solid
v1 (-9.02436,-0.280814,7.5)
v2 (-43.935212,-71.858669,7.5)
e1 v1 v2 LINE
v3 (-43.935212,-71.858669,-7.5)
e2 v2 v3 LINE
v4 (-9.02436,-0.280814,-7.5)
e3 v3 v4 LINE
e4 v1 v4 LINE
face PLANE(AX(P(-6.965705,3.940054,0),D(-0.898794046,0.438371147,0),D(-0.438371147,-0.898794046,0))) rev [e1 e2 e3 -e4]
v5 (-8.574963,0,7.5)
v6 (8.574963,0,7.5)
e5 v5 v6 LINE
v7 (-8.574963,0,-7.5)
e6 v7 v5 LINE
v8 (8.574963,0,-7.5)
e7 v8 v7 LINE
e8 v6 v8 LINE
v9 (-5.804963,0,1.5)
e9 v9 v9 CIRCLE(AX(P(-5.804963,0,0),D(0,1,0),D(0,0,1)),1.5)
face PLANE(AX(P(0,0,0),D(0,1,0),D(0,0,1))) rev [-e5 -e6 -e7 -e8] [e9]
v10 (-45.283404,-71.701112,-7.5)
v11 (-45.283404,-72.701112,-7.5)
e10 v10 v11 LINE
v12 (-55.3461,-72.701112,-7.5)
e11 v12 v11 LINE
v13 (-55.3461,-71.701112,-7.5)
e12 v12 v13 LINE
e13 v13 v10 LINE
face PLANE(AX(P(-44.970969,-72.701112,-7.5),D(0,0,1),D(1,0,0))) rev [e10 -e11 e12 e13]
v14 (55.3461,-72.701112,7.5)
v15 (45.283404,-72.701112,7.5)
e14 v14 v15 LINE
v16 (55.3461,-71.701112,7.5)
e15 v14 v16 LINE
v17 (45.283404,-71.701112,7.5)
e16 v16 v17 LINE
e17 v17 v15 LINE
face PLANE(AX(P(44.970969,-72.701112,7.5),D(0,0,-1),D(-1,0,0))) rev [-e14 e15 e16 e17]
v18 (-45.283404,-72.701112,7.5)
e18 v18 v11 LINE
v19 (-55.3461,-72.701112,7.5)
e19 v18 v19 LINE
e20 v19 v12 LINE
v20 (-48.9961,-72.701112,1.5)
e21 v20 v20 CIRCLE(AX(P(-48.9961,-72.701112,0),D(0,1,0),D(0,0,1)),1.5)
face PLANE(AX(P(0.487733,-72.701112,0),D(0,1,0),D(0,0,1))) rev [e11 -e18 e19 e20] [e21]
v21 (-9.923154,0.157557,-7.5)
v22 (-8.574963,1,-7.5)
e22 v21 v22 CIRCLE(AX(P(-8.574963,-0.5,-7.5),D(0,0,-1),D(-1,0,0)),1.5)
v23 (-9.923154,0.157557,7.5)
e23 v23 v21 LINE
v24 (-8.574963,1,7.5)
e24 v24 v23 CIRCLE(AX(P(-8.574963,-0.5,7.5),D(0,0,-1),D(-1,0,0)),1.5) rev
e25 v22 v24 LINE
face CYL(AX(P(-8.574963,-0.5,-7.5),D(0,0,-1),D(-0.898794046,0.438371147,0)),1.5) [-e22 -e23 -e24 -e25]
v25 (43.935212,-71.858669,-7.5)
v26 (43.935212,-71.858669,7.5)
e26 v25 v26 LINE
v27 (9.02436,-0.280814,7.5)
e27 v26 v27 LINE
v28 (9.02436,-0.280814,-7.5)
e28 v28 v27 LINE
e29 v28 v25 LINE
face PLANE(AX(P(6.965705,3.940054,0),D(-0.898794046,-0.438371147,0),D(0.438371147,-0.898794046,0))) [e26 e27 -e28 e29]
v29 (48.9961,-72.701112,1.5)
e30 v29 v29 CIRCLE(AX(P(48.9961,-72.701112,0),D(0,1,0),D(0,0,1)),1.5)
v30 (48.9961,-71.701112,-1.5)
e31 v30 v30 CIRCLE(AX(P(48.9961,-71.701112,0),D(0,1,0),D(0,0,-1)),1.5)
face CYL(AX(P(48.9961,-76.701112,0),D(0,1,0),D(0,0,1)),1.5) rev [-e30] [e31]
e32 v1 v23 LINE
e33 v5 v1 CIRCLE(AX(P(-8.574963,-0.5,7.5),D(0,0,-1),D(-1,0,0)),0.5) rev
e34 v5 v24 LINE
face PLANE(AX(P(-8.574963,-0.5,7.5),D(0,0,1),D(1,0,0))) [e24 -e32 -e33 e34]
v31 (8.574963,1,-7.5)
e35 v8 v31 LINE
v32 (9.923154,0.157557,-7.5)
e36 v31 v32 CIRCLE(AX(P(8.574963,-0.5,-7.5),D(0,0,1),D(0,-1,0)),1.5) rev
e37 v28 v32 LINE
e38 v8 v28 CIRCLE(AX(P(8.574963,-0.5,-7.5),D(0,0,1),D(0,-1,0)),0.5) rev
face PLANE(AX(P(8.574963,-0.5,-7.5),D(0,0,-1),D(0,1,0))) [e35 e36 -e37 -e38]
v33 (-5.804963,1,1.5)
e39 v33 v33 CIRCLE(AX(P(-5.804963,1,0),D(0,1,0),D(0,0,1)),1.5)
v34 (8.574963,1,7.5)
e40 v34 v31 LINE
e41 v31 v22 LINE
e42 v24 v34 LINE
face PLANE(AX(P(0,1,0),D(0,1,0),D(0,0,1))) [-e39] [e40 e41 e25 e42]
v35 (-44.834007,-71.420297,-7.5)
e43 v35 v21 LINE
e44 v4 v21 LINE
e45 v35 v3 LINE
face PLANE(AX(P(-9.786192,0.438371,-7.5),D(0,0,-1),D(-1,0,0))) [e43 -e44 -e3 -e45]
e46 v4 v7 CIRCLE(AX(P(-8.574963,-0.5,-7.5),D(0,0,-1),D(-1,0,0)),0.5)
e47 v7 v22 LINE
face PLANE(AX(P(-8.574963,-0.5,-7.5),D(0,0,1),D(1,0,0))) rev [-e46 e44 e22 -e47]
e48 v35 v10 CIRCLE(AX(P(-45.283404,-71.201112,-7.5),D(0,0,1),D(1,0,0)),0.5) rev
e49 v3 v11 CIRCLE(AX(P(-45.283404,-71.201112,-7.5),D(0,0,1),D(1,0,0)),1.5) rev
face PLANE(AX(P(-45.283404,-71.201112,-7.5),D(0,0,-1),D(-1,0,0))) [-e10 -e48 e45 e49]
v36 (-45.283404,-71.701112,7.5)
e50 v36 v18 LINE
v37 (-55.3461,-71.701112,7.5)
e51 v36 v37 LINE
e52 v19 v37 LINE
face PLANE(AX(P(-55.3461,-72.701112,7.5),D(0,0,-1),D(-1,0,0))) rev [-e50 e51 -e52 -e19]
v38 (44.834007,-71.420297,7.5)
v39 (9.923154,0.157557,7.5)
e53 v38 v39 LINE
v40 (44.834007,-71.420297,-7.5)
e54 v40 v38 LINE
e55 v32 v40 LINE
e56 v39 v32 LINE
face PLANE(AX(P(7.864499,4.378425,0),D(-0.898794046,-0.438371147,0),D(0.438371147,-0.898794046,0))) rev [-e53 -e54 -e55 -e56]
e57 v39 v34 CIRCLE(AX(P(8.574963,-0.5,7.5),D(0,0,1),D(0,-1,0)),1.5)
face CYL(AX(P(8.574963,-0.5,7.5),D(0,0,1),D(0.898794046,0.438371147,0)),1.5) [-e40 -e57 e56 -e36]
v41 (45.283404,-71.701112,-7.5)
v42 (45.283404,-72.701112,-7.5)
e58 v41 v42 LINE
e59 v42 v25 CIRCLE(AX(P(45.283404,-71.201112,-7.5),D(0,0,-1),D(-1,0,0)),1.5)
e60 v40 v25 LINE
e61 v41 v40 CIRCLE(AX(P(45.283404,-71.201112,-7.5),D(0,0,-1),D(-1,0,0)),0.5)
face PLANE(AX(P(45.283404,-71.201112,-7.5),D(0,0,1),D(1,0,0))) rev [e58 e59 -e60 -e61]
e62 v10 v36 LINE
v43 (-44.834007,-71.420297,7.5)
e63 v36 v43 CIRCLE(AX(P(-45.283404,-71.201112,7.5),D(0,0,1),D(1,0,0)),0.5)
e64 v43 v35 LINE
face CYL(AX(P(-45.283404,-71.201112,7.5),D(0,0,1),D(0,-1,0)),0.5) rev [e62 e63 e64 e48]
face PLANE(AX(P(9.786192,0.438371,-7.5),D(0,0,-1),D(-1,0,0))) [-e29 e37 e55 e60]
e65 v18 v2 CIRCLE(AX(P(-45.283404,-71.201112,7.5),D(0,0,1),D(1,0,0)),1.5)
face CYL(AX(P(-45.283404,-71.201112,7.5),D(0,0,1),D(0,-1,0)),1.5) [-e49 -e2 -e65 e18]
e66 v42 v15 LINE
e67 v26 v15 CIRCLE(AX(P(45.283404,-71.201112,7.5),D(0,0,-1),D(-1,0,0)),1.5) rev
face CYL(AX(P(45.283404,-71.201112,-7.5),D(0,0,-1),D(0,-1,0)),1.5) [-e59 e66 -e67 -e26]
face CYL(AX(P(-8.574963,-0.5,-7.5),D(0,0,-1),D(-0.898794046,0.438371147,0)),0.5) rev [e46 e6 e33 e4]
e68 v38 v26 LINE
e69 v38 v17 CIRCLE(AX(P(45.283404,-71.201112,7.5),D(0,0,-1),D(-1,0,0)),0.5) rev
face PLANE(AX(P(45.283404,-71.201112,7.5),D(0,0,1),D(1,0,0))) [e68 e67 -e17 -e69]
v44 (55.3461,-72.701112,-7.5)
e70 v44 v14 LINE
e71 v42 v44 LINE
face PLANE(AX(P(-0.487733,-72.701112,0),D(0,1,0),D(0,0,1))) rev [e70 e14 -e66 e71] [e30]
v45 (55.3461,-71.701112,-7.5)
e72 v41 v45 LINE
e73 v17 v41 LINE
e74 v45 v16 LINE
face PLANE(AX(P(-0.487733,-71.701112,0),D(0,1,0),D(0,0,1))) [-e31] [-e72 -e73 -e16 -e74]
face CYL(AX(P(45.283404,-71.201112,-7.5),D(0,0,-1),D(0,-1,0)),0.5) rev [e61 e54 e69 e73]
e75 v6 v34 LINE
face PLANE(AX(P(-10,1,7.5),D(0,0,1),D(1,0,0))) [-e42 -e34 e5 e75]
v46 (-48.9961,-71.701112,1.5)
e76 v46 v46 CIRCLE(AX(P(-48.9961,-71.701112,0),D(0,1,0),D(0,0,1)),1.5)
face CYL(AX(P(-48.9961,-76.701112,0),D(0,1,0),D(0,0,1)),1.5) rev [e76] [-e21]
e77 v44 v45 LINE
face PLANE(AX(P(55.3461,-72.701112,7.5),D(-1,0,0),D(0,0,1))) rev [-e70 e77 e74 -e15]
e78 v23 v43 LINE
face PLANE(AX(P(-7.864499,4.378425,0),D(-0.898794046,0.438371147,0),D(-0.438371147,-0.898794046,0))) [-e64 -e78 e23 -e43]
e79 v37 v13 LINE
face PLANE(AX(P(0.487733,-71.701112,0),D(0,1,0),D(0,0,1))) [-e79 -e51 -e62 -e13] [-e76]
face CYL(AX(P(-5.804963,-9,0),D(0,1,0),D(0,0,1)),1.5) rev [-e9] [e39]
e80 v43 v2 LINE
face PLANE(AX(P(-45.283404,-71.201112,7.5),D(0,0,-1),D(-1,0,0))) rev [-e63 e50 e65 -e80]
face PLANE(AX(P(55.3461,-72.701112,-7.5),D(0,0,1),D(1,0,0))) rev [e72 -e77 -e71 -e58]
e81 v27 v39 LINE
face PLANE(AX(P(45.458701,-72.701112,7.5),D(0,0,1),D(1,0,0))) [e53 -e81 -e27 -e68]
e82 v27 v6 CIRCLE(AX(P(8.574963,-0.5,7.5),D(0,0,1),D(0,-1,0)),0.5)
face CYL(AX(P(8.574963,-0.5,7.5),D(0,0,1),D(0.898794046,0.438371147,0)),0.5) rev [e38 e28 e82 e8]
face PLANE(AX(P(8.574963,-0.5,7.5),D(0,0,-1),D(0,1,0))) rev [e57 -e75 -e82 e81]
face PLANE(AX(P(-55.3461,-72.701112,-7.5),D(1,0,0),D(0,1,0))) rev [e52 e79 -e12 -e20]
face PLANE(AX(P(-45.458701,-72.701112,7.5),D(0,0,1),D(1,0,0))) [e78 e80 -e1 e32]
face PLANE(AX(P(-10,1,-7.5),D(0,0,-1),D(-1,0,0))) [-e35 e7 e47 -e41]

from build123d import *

# Parameters (mm, degrees)
SKETCH_1_W               = 20
SKETCH_1_H               = 15
EXTRUDE_1_DEPTH          = 1
SM_START                 = -7.5
SM_EDGE_FLANGE_2_DEPTH   = 15
SM_EDGE_FLANGE_2_2_DEPTH = 15
SM_EDGE_FLANGE_3_DEPTH   = 15
SM_EDGE_FLANGE_3_2_DEPTH = 15
SKETCH_27_R              = 1.5
CUT_EXTRUDE_1_DEPTH      = 5
SKETCH_28_R              = 1.5
CUT_EXTRUDE_2_DEPTH      = 10


# Read off the part's stored shape, not the designer's step: Ребро-кромка2, Ребро-кромка3
with BuildPart() as part:
    # Sketch 1 → Бобышка-Вытянуть1 (new body)
    with BuildSketch(Plane(origin=(0, 0, 0), x_dir=(1, 0, 0), z_dir=(0, 1, 0))):
        Rectangle(SKETCH_1_W, SKETCH_1_H)
    extrude(amount=EXTRUDE_1_DEPTH)

    # Ребро-кромка2 outline → Ребро-кромка2 (cut)
    with BuildSketch(Plane.XY.offset(SM_START)):
        with BuildLine():
            Line((-10, 0), (-9.923154453, 0.15755672))
            ThreePointArc((-9.923154453, 0.15755672), (-9.36984228, 0.772072144), (-8.574963384, 1))
            Line((-8.574963384, 1), (-10, 1))
            Line((-10, 1), (-10, 0))
        make_face()
        with BuildLine():
            Line((10, 1), (8.574963384, 1))
            ThreePointArc((8.574963384, 1), (9.36984228, 0.772072144), (9.923154453, 0.15755672))
            Line((9.923154453, 0.15755672), (10, 0))
            Line((10, 0), (10, 1))
        make_face()
    extrude(amount=SM_EDGE_FLANGE_2_DEPTH, mode=Mode.SUBTRACT)

    # Sm Edge Flange 2 2 outline → Sm Edge Flange 2 2 (add)
    with BuildSketch(Plane.XY.offset(SM_START)):
        with BuildLine():
            Line((-8.574963384, 0), (-10, 0))
            Line((-10, 0), (-45.458701448, -72.701111797))
            Line((-45.458701448, -72.701111797), (-44.559907402, -73.139482943))
            Line((-44.559907402, -73.139482943), (-9.024360407, -0.280814427))
            ThreePointArc((-9.024360407, -0.280814427), (-8.839923016, -0.075975952), (-8.574963384, 0))
        make_face()
        with BuildLine():
            Line((10, 0), (8.574963384, 0))
            ThreePointArc((8.574963384, 0), (8.839923016, -0.075975952), (9.024360407, -0.280814427))
            Line((9.024360407, -0.280814427), (44.559907402, -73.139482943))
            Line((44.559907402, -73.139482943), (45.458701448, -72.701111797))
            Line((45.458701448, -72.701111797), (10, 0))
        make_face()
    extrude(amount=SM_EDGE_FLANGE_2_2_DEPTH)

    # Ребро-кромка3 outline → Ребро-кромка3 (cut)
    with BuildSketch(Plane.XY.offset(SM_START)):
        with BuildLine():
            ThreePointArc((-43.935212466, -71.858668517), (-44.488524639, -72.473183941), (-45.283403536, -72.701111797))
            Line((-45.283403536, -72.701111797), (-45.458701448, -72.701111797))
            Line((-45.458701448, -72.701111797), (-44.559907402, -73.139482943))
            Line((-44.559907402, -73.139482943), (-43.935212466, -71.858668517))
        make_face()
        with BuildLine():
            Line((44.559907402, -73.139482943), (45.458701448, -72.701111797))
            Line((45.458701448, -72.701111797), (45.283403536, -72.701111797))
            ThreePointArc((45.283403536, -72.701111797), (44.488524639, -72.473183941), (43.935212466, -71.858668517))
            Line((43.935212466, -71.858668517), (44.559907402, -73.139482943))
        make_face()
    extrude(amount=SM_EDGE_FLANGE_3_DEPTH, mode=Mode.SUBTRACT)

    # Sm Edge Flange 3 2 outline → Sm Edge Flange 3 2 (add)
    with BuildSketch(Plane.XY.offset(SM_START)):
        with BuildLine():
            Line((-55.346099508, -72.701111797), (-45.458701448, -72.701111797))
            Line((-45.458701448, -72.701111797), (-44.834006512, -71.42029737))
            ThreePointArc((-44.834006512, -71.42029737), (-45.018443903, -71.625135845), (-45.283403536, -71.701111797))
            Line((-45.283403536, -71.701111797), (-55.346099508, -71.701111797))
            Line((-55.346099508, -71.701111797), (-55.346099508, -72.701111797))
        make_face()
        with BuildLine():
            Line((45.458701448, -72.701111797), (55.346099508, -72.701111797))
            Line((55.346099508, -72.701111797), (55.346099508, -71.701111797))
            Line((55.346099508, -71.701111797), (45.283403536, -71.701111797))
            ThreePointArc((45.283403536, -71.701111797), (45.018443903, -71.625135845), (44.834006512, -71.42029737))
            Line((44.834006512, -71.42029737), (45.458701448, -72.701111797))
        make_face()
    extrude(amount=SM_EDGE_FLANGE_3_2_DEPTH)

    # Эскиз27 → Вырез-Вытянуть1 (cut)
    with BuildSketch(Plane(origin=(0, -71.701111797, 0), x_dir=(1, 0, 0), z_dir=(0, 1, 0))):
        with Locations(Location((-48.996099508, 0, 0), (0, 0, 270))):
            Circle(SKETCH_27_R)
        with Locations(Location((48.996099508, 0, 0), (0, 0, 270))):
            Circle(SKETCH_27_R)
    extrude(amount=-CUT_EXTRUDE_1_DEPTH, mode=Mode.SUBTRACT)

    # Эскиз28 → Вырез-Вытянуть2 (cut)
    with BuildSketch(Plane(origin=(0, 1, 0), x_dir=(1, 0, 0), z_dir=(0, 1, 0))):
        with Locations(Location((-5.804963384, 0, 0), (0, 0, 270))):
            Circle(SKETCH_28_R)
    extrude(amount=-CUT_EXTRUDE_2_DEPTH, mode=Mode.SUBTRACT)


solid = part.part
